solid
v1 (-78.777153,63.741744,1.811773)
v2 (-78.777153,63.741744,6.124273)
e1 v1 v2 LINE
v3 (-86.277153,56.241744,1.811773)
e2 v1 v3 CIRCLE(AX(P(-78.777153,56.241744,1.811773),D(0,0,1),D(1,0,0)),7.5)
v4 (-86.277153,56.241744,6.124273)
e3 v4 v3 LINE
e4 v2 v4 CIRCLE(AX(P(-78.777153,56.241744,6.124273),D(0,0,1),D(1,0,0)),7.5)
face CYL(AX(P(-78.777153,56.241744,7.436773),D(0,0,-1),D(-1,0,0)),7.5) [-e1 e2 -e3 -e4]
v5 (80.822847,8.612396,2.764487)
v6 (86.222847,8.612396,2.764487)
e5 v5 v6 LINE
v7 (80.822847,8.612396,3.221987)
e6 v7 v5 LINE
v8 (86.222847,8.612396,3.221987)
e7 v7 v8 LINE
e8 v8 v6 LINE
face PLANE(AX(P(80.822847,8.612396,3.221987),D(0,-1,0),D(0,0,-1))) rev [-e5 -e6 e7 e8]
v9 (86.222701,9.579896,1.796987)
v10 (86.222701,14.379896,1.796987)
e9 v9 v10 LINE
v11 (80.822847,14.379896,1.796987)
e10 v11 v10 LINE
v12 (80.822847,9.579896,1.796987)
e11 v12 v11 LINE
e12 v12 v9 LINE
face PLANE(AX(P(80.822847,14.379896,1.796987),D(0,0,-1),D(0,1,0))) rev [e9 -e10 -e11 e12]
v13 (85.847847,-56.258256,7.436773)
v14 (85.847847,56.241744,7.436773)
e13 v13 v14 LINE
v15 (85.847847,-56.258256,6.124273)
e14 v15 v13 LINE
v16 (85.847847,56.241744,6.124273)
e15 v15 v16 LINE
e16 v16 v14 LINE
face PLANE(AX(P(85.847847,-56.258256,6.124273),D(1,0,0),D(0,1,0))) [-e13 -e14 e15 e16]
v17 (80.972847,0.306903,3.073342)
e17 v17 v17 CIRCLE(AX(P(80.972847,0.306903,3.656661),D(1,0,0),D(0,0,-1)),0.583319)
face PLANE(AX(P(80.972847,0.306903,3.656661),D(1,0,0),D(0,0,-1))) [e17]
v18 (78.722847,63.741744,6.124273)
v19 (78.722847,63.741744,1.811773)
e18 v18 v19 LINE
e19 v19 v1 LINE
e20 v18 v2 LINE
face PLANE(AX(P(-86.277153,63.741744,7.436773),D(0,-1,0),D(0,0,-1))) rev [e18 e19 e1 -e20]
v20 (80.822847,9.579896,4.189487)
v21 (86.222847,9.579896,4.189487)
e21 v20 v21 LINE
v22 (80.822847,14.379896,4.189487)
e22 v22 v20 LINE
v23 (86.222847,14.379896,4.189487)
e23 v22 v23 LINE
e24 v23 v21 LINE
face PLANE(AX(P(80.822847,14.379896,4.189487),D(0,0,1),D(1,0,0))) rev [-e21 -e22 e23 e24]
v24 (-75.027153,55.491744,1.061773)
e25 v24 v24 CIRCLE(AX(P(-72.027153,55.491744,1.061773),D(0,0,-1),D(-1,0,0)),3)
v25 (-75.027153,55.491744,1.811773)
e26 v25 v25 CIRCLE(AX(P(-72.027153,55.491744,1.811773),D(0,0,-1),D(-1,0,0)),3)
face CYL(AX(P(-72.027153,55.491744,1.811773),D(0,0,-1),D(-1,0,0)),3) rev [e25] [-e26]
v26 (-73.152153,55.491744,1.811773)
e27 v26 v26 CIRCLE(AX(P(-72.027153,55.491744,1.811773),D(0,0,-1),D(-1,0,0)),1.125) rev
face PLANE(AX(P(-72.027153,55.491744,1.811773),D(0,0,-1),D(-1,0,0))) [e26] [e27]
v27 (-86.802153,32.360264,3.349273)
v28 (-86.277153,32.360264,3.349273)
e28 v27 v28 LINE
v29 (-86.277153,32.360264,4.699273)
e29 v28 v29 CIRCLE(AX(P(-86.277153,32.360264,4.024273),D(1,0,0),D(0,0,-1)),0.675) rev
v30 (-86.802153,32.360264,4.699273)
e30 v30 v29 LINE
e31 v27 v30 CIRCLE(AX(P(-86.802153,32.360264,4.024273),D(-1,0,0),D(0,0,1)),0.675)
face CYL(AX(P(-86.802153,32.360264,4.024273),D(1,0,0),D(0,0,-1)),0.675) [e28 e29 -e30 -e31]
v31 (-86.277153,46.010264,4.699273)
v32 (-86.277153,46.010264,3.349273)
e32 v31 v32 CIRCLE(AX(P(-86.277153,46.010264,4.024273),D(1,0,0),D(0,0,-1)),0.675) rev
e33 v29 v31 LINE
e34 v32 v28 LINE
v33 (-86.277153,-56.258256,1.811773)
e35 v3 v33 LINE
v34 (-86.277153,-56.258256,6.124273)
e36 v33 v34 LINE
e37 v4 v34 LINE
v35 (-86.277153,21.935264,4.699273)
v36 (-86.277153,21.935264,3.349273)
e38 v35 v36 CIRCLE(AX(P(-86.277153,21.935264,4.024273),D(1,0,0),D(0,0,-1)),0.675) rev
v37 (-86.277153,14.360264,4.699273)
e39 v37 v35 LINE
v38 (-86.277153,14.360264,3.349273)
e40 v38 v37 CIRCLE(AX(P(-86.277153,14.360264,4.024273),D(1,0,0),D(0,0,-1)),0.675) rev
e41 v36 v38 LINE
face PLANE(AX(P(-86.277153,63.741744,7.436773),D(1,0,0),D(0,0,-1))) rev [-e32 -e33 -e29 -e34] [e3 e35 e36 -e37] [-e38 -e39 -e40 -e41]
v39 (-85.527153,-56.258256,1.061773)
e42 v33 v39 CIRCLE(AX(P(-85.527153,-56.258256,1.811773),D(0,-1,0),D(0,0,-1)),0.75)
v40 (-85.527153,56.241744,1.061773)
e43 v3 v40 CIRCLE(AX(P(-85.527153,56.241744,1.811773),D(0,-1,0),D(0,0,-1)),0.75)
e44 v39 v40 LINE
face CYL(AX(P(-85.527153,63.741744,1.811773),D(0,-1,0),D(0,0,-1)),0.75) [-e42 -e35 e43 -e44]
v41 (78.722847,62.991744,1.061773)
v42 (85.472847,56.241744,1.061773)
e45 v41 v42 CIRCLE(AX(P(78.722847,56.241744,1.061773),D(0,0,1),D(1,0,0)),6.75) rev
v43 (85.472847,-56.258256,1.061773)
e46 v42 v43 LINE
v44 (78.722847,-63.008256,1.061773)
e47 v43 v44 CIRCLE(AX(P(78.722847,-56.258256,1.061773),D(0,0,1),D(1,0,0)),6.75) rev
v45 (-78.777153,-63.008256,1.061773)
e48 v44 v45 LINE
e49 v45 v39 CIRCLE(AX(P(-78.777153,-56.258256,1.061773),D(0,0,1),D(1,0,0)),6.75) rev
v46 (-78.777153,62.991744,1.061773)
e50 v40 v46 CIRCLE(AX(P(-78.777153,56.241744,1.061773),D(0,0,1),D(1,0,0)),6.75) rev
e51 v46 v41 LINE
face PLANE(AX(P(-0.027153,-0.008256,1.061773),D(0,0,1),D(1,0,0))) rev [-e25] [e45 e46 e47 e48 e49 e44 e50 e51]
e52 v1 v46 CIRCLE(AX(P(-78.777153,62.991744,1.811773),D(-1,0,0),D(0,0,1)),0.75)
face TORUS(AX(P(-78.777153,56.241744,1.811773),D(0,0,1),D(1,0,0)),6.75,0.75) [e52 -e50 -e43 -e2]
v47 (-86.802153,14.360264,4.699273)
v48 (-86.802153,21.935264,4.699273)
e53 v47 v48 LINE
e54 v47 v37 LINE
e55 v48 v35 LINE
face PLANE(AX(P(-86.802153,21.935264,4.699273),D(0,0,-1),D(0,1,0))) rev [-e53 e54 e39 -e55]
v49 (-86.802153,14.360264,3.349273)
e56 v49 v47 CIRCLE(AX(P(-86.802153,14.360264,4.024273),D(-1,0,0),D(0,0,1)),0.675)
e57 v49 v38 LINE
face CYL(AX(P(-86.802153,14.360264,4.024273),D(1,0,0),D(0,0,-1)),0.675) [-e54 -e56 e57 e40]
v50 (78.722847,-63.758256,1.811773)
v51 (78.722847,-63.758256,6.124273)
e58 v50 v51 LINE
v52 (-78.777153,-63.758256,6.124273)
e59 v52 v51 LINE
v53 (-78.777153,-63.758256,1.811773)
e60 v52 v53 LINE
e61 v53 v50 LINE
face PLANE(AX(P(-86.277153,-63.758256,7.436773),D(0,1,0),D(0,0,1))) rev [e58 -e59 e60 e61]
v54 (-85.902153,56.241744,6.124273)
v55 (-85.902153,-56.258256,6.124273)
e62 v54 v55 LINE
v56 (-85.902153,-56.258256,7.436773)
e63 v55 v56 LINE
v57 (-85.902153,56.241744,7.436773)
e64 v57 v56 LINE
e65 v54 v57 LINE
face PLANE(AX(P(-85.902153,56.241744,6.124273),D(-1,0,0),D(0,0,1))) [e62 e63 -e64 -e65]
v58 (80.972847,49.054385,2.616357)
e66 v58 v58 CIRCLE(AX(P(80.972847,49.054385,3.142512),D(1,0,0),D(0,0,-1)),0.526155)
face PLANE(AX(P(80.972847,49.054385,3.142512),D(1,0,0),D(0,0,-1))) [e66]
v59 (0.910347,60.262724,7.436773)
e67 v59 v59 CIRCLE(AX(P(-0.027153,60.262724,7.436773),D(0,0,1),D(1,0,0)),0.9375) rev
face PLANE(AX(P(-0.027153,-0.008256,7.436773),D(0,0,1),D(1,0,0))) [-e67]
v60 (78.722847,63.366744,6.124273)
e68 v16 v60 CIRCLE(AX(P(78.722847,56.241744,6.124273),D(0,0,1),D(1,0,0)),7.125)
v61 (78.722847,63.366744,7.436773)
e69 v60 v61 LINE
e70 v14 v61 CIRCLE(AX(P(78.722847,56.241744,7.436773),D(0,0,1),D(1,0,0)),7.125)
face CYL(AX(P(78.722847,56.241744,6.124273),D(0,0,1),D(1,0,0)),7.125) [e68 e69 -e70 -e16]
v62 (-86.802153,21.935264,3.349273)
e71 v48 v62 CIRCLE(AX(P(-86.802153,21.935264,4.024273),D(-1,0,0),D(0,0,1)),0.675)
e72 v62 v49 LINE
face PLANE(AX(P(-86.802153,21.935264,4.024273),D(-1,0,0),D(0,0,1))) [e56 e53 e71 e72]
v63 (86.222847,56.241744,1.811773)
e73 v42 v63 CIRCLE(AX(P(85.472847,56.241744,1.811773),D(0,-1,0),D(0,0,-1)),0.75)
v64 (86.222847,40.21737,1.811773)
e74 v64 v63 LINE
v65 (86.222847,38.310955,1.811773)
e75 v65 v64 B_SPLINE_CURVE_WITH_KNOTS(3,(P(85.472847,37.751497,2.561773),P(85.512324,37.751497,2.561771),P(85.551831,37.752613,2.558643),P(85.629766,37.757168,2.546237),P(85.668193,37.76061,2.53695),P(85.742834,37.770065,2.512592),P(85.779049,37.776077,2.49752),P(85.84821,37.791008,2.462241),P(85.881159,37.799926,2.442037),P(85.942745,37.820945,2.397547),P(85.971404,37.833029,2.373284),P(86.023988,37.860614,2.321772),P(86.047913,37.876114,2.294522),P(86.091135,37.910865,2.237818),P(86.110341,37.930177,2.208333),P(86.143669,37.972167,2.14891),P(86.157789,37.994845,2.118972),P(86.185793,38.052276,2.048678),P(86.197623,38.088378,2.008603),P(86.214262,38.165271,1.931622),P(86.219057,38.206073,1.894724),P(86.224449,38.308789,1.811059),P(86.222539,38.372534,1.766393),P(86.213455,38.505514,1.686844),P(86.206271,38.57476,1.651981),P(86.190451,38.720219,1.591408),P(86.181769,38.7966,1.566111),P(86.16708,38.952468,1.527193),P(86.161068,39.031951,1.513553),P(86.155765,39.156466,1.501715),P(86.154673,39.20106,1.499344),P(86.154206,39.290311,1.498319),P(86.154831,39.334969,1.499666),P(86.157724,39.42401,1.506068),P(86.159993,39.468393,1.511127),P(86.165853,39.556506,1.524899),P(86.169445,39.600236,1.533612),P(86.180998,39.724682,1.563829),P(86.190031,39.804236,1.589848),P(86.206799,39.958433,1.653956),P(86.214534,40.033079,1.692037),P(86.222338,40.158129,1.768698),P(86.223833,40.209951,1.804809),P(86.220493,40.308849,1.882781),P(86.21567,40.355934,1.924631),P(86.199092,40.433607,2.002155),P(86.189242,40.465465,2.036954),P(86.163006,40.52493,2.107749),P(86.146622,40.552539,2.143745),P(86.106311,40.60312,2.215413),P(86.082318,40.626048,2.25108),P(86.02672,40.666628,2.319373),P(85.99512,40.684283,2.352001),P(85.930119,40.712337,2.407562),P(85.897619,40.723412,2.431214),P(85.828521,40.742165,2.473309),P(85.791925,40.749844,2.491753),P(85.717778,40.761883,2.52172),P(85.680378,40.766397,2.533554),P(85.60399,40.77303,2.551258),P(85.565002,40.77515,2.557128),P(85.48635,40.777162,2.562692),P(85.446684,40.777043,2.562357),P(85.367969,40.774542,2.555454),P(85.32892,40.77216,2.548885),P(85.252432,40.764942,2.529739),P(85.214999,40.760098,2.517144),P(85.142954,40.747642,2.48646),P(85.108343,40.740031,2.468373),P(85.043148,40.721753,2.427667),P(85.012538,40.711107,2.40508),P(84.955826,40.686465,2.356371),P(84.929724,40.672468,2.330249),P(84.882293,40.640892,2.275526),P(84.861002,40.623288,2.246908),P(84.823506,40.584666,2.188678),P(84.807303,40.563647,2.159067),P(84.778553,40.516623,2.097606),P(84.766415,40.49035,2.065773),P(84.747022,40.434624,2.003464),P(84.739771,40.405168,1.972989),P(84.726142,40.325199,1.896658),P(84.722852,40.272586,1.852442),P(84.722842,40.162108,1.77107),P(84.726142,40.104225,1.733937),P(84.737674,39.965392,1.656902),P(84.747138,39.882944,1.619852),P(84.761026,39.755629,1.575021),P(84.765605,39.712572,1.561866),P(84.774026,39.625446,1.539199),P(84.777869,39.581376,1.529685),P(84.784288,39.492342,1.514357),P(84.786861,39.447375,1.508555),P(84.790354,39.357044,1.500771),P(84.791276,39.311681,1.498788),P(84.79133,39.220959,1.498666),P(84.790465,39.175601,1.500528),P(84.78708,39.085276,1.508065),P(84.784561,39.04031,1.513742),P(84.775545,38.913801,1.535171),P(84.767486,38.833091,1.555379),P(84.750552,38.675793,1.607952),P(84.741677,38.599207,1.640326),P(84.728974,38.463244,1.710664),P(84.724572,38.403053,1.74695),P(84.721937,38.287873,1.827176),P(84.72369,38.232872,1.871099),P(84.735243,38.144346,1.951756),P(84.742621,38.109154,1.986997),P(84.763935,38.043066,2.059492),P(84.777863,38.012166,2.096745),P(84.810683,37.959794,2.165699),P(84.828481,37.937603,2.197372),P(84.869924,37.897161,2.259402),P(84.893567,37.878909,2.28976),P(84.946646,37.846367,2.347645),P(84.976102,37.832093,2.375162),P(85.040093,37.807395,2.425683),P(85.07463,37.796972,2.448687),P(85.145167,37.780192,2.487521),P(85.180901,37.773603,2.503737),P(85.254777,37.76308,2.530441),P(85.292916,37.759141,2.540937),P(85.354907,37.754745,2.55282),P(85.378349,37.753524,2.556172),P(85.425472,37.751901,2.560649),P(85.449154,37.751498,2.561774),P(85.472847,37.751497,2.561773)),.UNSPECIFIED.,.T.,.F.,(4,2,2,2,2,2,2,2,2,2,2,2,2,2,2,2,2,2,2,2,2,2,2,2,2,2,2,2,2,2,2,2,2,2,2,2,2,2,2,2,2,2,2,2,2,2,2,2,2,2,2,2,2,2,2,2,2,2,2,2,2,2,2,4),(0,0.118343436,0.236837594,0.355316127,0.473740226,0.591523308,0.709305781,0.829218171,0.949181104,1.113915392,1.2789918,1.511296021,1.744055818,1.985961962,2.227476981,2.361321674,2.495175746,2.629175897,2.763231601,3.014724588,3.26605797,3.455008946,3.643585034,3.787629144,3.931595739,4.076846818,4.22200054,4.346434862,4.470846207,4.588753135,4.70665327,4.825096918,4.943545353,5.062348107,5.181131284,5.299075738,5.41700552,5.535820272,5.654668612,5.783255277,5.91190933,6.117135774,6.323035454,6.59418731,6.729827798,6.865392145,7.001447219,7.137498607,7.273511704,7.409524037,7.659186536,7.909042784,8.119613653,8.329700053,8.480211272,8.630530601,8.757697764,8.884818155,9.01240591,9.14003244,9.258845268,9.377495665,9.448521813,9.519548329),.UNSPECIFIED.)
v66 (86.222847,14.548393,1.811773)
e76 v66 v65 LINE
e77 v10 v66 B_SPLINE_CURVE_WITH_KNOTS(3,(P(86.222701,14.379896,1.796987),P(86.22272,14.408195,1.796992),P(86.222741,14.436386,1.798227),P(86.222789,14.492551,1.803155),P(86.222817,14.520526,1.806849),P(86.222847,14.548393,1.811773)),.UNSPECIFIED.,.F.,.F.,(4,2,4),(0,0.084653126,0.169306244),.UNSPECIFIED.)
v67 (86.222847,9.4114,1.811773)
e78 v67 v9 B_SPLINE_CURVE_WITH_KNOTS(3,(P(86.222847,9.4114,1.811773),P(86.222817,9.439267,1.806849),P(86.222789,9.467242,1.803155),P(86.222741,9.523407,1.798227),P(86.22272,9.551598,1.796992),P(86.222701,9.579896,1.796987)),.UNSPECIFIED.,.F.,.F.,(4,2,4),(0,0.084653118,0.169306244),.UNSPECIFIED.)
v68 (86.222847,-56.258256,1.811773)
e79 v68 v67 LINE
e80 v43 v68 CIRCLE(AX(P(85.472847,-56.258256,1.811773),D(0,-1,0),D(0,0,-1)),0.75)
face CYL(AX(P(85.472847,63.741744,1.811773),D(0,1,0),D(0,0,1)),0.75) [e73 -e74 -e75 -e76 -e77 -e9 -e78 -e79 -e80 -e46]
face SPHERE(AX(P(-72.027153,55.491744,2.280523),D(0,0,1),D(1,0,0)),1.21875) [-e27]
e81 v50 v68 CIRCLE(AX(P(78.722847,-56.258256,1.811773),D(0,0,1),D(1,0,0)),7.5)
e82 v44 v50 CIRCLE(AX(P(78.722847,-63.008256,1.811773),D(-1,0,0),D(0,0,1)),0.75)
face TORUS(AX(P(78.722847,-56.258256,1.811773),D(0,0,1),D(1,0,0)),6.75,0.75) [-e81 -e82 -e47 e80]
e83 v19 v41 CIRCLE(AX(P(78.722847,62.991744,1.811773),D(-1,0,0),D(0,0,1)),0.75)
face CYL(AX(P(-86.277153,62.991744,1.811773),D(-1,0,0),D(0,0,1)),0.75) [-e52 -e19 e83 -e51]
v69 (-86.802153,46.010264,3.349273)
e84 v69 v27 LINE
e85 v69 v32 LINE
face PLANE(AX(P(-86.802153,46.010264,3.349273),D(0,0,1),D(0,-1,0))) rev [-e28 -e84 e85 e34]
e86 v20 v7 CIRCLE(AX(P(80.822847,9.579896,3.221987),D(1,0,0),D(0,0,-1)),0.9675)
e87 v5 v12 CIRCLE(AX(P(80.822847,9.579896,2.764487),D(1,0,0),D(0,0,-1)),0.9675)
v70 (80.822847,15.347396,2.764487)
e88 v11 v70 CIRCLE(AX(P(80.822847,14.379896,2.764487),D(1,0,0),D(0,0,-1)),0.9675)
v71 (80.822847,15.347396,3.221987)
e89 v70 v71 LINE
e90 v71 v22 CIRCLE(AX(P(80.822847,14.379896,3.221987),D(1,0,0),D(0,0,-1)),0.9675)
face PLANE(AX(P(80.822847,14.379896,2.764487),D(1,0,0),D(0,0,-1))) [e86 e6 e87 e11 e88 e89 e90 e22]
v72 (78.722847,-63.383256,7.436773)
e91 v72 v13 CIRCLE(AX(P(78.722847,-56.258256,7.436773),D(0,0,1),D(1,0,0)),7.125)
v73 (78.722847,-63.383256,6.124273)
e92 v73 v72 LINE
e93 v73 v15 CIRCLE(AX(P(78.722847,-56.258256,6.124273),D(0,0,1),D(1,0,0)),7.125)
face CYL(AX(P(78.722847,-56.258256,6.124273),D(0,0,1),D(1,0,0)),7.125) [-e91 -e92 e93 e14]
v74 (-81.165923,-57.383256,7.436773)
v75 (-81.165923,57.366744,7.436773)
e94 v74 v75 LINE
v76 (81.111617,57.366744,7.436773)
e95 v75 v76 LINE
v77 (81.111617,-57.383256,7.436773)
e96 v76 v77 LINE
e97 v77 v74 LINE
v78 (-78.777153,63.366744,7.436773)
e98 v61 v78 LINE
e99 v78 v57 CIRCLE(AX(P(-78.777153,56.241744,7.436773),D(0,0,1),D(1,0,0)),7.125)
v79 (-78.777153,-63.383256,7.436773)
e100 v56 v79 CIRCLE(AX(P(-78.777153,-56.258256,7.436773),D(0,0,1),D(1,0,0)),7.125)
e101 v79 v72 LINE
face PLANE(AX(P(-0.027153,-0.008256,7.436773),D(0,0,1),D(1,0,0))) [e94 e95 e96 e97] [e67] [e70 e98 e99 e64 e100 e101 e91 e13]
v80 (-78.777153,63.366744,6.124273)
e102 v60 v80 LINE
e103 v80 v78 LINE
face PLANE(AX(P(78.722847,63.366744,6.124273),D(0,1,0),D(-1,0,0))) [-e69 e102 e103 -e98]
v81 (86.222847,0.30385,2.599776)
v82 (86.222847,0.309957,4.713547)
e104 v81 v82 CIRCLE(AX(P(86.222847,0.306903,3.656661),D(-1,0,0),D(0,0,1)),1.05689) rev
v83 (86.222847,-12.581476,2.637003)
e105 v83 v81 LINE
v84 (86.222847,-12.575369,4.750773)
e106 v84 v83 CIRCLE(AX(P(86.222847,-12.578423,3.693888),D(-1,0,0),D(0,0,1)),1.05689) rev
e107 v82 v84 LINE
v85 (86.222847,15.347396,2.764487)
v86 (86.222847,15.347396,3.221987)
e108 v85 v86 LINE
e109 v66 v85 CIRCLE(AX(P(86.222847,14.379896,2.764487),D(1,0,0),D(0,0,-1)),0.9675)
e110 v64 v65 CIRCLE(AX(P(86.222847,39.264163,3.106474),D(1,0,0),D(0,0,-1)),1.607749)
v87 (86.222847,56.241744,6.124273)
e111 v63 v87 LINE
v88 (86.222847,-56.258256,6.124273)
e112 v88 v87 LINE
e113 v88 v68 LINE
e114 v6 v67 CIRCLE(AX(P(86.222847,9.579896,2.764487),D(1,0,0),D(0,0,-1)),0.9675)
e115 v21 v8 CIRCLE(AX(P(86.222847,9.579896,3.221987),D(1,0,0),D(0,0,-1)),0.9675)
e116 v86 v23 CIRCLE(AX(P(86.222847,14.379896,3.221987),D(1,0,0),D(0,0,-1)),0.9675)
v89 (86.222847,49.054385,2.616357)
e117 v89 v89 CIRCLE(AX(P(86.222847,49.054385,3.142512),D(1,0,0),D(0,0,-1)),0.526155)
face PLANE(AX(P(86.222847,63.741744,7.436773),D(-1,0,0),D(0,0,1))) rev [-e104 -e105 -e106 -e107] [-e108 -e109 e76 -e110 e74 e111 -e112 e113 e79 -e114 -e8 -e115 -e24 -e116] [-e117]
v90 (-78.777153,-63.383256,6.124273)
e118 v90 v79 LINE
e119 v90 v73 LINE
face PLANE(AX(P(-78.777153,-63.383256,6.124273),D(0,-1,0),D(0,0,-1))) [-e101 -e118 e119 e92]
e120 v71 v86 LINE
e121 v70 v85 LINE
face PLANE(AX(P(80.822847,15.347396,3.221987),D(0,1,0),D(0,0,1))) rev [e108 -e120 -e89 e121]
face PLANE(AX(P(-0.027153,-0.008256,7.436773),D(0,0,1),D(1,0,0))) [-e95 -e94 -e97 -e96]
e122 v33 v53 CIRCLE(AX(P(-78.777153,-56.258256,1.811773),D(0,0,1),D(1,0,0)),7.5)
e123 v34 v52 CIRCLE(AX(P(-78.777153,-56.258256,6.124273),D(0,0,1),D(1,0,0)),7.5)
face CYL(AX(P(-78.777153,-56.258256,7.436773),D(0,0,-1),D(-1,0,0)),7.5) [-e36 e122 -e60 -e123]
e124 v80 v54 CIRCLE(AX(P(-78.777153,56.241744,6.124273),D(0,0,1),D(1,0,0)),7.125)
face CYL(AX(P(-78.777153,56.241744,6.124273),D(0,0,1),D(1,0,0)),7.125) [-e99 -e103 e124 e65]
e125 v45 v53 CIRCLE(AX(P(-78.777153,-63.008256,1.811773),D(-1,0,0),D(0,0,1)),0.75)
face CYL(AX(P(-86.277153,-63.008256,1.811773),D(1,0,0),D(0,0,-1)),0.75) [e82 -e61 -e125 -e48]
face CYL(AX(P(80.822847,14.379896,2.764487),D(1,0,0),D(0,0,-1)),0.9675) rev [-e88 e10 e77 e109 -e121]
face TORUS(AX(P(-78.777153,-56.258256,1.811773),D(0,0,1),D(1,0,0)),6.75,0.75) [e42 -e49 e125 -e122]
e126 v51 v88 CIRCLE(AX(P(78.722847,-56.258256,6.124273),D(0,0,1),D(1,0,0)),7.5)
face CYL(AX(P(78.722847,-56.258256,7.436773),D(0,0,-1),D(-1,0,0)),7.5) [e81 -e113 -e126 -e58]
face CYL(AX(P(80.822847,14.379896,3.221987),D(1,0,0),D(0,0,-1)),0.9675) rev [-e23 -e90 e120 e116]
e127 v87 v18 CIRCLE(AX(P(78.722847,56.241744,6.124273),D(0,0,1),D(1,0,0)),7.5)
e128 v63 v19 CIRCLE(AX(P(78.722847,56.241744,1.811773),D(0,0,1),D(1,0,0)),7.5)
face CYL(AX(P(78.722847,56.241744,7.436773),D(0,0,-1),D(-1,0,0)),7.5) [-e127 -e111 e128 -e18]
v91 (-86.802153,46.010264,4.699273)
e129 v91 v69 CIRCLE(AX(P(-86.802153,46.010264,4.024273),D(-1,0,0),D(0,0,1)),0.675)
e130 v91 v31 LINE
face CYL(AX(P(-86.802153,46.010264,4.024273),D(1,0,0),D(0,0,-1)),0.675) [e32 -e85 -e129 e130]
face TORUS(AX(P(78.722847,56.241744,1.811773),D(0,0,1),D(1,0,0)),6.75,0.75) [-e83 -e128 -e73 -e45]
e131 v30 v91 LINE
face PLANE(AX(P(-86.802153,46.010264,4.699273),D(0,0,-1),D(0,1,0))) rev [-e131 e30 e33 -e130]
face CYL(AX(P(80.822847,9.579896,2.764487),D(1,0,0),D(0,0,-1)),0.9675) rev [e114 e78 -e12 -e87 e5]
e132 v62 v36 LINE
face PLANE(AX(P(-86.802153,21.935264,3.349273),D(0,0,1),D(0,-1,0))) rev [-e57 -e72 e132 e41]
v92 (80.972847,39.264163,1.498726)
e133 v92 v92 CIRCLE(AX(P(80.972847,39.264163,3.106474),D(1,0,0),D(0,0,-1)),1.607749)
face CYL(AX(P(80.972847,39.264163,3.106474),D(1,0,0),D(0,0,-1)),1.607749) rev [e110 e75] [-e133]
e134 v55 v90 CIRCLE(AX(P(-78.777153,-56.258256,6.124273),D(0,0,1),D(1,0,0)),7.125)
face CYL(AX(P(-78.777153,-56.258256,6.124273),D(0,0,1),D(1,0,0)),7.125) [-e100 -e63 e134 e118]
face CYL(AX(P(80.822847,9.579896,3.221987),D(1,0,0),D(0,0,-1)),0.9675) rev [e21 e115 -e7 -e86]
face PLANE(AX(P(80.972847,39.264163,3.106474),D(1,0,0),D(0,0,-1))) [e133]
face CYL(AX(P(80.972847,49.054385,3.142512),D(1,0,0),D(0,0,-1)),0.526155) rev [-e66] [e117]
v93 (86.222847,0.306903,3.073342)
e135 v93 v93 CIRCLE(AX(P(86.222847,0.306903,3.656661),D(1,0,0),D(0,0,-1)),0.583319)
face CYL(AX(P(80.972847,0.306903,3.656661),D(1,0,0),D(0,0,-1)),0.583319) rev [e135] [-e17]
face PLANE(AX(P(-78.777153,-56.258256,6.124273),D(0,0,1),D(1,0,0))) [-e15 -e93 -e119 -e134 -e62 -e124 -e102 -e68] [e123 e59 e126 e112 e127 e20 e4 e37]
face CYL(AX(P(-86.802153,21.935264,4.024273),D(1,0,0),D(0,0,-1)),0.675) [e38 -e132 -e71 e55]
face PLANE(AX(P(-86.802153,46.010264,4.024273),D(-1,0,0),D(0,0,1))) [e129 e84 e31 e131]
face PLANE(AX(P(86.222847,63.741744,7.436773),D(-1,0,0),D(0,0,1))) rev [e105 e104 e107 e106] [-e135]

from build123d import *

# Parameters (mm, degrees)
SKETCH1_W           = 230
SKETCH1_H           = 170
BOSS_EXTRUDE1_DEPTH = 8.5
FILLET1_R           = 10
FILLET2_R           = 1
CUT_EXTRUDE1_DEPTH  = 7.2
SKETCH9_R           = 2.143665007
SKETCH9_R_2         = 0.701539988
SKETCH9_R_3         = 0.777758638
CUT_EXTRUDE2_DEPTH  = 7
CUT_EXTRUDE3_DEPTH  = 1.75
BOSS_EXTRUDE2_DEPTH = 0.7
SKETCH16_R          = 4
CUT_EXTRUDE4_DEPTH  = 1
SCALE2_SCALE        = 0.75


# Read off the part's stored shape, not the designer's step: Dome1
with BuildPart() as part:
    # Sketch1 → Boss-Extrude1 (new body)
    with BuildSketch(Plane.XY):
        Rectangle(SKETCH1_W, SKETCH1_H)
    extrude(amount=BOSS_EXTRUDE1_DEPTH)

    # Fillet1
    fillet1_edges = [part.edges().sort_by_distance(p)[0] for p in [
        (115, -85, 4.25),
        (-115, -85, 4.25),
        (-115, 85, 4.25),
        (115, 85, 4.25),
    ]]
    fillet(fillet1_edges, radius=FILLET1_R)

    # Fillet2
    fillet2_edges = [part.edges().sort_by_distance(p)[0] for p in [
        (115, 0, 0),
        (0, -85, 0),
        (-115, 0, 0),
        (0, 85, 0),
        (-112.071067812, 82.071067812, 0),
        (112.071067812, 82.071067812, 0),
        (-112.071067812, -82.071067812, 0),
        (112.071067812, -82.071067812, 0),
    ]]
    fillet(fillet2_edges, radius=FILLET2_R)

    # Sketch8 → Cut-Extrude1 (cut)
    with BuildSketch(Plane(origin=(115, 0, 0), x_dir=(0, 0, -1), z_dir=(1, 0, 0))):
        with BuildLine():
            Line((-0.980286153, 19.184203106), (-0.980286153, 12.784203106))
            ThreePointArc((-0.980286153, 12.784203106), (-1.358118405, 11.872035358), (-2.270286153, 11.494203106))
            Line((-2.270286153, 11.494203106), (-2.880286153, 11.494203106))
            ThreePointArc((-2.880286153, 11.494203106), (-3.7924539, 11.872035358), (-4.170286153, 12.784203106))
            Line((-4.170286153, 12.784203106), (-4.170286153, 19.184203106))
            ThreePointArc((-4.170286153, 19.184203106), (-3.7924539, 20.096370853), (-2.880286153, 20.474203106))
            Line((-2.880286153, 20.474203106), (-2.270286153, 20.474203106))
            ThreePointArc((-2.270286153, 20.474203106), (-1.358118405, 20.096370853), (-0.980286153, 19.184203106))
        make_face()
    extrude(amount=-CUT_EXTRUDE1_DEPTH, mode=Mode.SUBTRACT)

    # Sketch9 → Cut-Extrude2 (cut)
    with BuildSketch(Plane(origin=(115, 0, 0), x_dir=(0, 0, -1), z_dir=(1, 0, 0))):
        with Locations((-2.726268546, 52.363224928)):
            Circle(SKETCH9_R)
        with Locations((-2.774318312, 65.416854758)):
            Circle(SKETCH9_R_2)
        with Locations((-3.459851421, 0.420212385)):
            Circle(SKETCH9_R_3)
    extrude(amount=-CUT_EXTRUDE2_DEPTH, mode=Mode.SUBTRACT)

    # Sketch11 → Cut-Extrude3 (cut)
    with BuildSketch(Plane.XY.offset(8.5)):
        with BuildLine():
            Line((-105, -85), (105, -85))
            ThreePointArc((105, -85), (112.071067812, -82.071067812), (115, -75))
            Line((115, -75), (115, 75))
            ThreePointArc((115, 75), (112.071067812, 82.071067812), (105, 85))
            Line((105, 85), (-105, 85))
            ThreePointArc((-105, 85), (-112.071067812, 82.071067812), (-115, 75))
            Line((-115, 75), (-115, -75))
            ThreePointArc((-115, -75), (-112.071067812, -82.071067812), (-105, -85))
        make_face()
        with BuildLine():
            Line((-105, -84.5), (105, -84.5))
            ThreePointArc((105, -84.5), (111.717514421, -81.717514421), (114.5, -75))
            Line((114.5, -75), (114.5, 75))
            ThreePointArc((114.5, 75), (111.717514421, 81.717514421), (105, 84.5))
            Line((105, 84.5), (-105, 84.5))
            ThreePointArc((-105, 84.5), (-111.717514421, 81.717514421), (-114.5, 75))
            Line((-114.5, 75), (-114.5, -75))
            ThreePointArc((-114.5, -75), (-111.717514421, -81.717514421), (-105, -84.5))
        make_face(mode=Mode.SUBTRACT)
    extrude(amount=-CUT_EXTRUDE3_DEPTH, mode=Mode.SUBTRACT)

    # Sketch13<3> → Boss-Extrude2 (add)
    with BuildSketch(Plane.ZY.offset(115)):
        with BuildLine():
            Line((4.85, 29.258026972), (4.85, 19.158026972))
            ThreePointArc((4.85, 19.158026972), (3.95, 18.258026972), (3.05, 19.158026972))
            Line((3.05, 19.158026972), (3.05, 29.258026972))
            ThreePointArc((3.05, 29.258026972), (3.95, 30.158026972), (4.85, 29.258026972))
        make_face()
        with BuildLine():
            Line((4.85, 61.358026972), (4.85, 43.158026972))
            ThreePointArc((4.85, 43.158026972), (3.95, 42.258026972), (3.05, 43.158026972))
            Line((3.05, 43.158026972), (3.05, 61.358026972))
            ThreePointArc((3.05, 61.358026972), (3.95, 62.258026972), (4.85, 61.358026972))
        make_face()
    extrude(amount=BOSS_EXTRUDE2_DEPTH)

    # Sketch16 → Cut-Extrude4 (cut)
    with BuildSketch(Plane(origin=(0, 0, 0), x_dir=(-1, 0, 0), z_dir=(0, 0, -1))):
        with Locations((96, 74)):
            Circle(SKETCH16_R)
    extrude(amount=-CUT_EXTRUDE4_DEPTH, mode=Mode.SUBTRACT)

    # Dome1 outline → Dome1 (revolve)
    with BuildSketch(Plane(origin=(-96, 74, 0), x_dir=(1, 0, 0), z_dir=(0, -1, 0))):
        with BuildLine():
            Line((0, 1.000000002), (0, 0))
            ThreePointArc((0, 0), (0.90138782, 0.272918272), (1.500000001, 1.000000002))
            Line((1.500000001, 1.000000002), (0, 1.000000002))
        make_face()
    revolve(axis=Axis((-96, 74, 0), (0, 0, 1)))


with BuildPart() as part_1:
    # Scale2: scaled about (-0.108567149, -0.033027208, 4.247091052)
    add(part.part.scale(SCALE2_SCALE).moved(Location((-0.027141787, -0.008256802, 1.061772763))))


solid = part_1.part
